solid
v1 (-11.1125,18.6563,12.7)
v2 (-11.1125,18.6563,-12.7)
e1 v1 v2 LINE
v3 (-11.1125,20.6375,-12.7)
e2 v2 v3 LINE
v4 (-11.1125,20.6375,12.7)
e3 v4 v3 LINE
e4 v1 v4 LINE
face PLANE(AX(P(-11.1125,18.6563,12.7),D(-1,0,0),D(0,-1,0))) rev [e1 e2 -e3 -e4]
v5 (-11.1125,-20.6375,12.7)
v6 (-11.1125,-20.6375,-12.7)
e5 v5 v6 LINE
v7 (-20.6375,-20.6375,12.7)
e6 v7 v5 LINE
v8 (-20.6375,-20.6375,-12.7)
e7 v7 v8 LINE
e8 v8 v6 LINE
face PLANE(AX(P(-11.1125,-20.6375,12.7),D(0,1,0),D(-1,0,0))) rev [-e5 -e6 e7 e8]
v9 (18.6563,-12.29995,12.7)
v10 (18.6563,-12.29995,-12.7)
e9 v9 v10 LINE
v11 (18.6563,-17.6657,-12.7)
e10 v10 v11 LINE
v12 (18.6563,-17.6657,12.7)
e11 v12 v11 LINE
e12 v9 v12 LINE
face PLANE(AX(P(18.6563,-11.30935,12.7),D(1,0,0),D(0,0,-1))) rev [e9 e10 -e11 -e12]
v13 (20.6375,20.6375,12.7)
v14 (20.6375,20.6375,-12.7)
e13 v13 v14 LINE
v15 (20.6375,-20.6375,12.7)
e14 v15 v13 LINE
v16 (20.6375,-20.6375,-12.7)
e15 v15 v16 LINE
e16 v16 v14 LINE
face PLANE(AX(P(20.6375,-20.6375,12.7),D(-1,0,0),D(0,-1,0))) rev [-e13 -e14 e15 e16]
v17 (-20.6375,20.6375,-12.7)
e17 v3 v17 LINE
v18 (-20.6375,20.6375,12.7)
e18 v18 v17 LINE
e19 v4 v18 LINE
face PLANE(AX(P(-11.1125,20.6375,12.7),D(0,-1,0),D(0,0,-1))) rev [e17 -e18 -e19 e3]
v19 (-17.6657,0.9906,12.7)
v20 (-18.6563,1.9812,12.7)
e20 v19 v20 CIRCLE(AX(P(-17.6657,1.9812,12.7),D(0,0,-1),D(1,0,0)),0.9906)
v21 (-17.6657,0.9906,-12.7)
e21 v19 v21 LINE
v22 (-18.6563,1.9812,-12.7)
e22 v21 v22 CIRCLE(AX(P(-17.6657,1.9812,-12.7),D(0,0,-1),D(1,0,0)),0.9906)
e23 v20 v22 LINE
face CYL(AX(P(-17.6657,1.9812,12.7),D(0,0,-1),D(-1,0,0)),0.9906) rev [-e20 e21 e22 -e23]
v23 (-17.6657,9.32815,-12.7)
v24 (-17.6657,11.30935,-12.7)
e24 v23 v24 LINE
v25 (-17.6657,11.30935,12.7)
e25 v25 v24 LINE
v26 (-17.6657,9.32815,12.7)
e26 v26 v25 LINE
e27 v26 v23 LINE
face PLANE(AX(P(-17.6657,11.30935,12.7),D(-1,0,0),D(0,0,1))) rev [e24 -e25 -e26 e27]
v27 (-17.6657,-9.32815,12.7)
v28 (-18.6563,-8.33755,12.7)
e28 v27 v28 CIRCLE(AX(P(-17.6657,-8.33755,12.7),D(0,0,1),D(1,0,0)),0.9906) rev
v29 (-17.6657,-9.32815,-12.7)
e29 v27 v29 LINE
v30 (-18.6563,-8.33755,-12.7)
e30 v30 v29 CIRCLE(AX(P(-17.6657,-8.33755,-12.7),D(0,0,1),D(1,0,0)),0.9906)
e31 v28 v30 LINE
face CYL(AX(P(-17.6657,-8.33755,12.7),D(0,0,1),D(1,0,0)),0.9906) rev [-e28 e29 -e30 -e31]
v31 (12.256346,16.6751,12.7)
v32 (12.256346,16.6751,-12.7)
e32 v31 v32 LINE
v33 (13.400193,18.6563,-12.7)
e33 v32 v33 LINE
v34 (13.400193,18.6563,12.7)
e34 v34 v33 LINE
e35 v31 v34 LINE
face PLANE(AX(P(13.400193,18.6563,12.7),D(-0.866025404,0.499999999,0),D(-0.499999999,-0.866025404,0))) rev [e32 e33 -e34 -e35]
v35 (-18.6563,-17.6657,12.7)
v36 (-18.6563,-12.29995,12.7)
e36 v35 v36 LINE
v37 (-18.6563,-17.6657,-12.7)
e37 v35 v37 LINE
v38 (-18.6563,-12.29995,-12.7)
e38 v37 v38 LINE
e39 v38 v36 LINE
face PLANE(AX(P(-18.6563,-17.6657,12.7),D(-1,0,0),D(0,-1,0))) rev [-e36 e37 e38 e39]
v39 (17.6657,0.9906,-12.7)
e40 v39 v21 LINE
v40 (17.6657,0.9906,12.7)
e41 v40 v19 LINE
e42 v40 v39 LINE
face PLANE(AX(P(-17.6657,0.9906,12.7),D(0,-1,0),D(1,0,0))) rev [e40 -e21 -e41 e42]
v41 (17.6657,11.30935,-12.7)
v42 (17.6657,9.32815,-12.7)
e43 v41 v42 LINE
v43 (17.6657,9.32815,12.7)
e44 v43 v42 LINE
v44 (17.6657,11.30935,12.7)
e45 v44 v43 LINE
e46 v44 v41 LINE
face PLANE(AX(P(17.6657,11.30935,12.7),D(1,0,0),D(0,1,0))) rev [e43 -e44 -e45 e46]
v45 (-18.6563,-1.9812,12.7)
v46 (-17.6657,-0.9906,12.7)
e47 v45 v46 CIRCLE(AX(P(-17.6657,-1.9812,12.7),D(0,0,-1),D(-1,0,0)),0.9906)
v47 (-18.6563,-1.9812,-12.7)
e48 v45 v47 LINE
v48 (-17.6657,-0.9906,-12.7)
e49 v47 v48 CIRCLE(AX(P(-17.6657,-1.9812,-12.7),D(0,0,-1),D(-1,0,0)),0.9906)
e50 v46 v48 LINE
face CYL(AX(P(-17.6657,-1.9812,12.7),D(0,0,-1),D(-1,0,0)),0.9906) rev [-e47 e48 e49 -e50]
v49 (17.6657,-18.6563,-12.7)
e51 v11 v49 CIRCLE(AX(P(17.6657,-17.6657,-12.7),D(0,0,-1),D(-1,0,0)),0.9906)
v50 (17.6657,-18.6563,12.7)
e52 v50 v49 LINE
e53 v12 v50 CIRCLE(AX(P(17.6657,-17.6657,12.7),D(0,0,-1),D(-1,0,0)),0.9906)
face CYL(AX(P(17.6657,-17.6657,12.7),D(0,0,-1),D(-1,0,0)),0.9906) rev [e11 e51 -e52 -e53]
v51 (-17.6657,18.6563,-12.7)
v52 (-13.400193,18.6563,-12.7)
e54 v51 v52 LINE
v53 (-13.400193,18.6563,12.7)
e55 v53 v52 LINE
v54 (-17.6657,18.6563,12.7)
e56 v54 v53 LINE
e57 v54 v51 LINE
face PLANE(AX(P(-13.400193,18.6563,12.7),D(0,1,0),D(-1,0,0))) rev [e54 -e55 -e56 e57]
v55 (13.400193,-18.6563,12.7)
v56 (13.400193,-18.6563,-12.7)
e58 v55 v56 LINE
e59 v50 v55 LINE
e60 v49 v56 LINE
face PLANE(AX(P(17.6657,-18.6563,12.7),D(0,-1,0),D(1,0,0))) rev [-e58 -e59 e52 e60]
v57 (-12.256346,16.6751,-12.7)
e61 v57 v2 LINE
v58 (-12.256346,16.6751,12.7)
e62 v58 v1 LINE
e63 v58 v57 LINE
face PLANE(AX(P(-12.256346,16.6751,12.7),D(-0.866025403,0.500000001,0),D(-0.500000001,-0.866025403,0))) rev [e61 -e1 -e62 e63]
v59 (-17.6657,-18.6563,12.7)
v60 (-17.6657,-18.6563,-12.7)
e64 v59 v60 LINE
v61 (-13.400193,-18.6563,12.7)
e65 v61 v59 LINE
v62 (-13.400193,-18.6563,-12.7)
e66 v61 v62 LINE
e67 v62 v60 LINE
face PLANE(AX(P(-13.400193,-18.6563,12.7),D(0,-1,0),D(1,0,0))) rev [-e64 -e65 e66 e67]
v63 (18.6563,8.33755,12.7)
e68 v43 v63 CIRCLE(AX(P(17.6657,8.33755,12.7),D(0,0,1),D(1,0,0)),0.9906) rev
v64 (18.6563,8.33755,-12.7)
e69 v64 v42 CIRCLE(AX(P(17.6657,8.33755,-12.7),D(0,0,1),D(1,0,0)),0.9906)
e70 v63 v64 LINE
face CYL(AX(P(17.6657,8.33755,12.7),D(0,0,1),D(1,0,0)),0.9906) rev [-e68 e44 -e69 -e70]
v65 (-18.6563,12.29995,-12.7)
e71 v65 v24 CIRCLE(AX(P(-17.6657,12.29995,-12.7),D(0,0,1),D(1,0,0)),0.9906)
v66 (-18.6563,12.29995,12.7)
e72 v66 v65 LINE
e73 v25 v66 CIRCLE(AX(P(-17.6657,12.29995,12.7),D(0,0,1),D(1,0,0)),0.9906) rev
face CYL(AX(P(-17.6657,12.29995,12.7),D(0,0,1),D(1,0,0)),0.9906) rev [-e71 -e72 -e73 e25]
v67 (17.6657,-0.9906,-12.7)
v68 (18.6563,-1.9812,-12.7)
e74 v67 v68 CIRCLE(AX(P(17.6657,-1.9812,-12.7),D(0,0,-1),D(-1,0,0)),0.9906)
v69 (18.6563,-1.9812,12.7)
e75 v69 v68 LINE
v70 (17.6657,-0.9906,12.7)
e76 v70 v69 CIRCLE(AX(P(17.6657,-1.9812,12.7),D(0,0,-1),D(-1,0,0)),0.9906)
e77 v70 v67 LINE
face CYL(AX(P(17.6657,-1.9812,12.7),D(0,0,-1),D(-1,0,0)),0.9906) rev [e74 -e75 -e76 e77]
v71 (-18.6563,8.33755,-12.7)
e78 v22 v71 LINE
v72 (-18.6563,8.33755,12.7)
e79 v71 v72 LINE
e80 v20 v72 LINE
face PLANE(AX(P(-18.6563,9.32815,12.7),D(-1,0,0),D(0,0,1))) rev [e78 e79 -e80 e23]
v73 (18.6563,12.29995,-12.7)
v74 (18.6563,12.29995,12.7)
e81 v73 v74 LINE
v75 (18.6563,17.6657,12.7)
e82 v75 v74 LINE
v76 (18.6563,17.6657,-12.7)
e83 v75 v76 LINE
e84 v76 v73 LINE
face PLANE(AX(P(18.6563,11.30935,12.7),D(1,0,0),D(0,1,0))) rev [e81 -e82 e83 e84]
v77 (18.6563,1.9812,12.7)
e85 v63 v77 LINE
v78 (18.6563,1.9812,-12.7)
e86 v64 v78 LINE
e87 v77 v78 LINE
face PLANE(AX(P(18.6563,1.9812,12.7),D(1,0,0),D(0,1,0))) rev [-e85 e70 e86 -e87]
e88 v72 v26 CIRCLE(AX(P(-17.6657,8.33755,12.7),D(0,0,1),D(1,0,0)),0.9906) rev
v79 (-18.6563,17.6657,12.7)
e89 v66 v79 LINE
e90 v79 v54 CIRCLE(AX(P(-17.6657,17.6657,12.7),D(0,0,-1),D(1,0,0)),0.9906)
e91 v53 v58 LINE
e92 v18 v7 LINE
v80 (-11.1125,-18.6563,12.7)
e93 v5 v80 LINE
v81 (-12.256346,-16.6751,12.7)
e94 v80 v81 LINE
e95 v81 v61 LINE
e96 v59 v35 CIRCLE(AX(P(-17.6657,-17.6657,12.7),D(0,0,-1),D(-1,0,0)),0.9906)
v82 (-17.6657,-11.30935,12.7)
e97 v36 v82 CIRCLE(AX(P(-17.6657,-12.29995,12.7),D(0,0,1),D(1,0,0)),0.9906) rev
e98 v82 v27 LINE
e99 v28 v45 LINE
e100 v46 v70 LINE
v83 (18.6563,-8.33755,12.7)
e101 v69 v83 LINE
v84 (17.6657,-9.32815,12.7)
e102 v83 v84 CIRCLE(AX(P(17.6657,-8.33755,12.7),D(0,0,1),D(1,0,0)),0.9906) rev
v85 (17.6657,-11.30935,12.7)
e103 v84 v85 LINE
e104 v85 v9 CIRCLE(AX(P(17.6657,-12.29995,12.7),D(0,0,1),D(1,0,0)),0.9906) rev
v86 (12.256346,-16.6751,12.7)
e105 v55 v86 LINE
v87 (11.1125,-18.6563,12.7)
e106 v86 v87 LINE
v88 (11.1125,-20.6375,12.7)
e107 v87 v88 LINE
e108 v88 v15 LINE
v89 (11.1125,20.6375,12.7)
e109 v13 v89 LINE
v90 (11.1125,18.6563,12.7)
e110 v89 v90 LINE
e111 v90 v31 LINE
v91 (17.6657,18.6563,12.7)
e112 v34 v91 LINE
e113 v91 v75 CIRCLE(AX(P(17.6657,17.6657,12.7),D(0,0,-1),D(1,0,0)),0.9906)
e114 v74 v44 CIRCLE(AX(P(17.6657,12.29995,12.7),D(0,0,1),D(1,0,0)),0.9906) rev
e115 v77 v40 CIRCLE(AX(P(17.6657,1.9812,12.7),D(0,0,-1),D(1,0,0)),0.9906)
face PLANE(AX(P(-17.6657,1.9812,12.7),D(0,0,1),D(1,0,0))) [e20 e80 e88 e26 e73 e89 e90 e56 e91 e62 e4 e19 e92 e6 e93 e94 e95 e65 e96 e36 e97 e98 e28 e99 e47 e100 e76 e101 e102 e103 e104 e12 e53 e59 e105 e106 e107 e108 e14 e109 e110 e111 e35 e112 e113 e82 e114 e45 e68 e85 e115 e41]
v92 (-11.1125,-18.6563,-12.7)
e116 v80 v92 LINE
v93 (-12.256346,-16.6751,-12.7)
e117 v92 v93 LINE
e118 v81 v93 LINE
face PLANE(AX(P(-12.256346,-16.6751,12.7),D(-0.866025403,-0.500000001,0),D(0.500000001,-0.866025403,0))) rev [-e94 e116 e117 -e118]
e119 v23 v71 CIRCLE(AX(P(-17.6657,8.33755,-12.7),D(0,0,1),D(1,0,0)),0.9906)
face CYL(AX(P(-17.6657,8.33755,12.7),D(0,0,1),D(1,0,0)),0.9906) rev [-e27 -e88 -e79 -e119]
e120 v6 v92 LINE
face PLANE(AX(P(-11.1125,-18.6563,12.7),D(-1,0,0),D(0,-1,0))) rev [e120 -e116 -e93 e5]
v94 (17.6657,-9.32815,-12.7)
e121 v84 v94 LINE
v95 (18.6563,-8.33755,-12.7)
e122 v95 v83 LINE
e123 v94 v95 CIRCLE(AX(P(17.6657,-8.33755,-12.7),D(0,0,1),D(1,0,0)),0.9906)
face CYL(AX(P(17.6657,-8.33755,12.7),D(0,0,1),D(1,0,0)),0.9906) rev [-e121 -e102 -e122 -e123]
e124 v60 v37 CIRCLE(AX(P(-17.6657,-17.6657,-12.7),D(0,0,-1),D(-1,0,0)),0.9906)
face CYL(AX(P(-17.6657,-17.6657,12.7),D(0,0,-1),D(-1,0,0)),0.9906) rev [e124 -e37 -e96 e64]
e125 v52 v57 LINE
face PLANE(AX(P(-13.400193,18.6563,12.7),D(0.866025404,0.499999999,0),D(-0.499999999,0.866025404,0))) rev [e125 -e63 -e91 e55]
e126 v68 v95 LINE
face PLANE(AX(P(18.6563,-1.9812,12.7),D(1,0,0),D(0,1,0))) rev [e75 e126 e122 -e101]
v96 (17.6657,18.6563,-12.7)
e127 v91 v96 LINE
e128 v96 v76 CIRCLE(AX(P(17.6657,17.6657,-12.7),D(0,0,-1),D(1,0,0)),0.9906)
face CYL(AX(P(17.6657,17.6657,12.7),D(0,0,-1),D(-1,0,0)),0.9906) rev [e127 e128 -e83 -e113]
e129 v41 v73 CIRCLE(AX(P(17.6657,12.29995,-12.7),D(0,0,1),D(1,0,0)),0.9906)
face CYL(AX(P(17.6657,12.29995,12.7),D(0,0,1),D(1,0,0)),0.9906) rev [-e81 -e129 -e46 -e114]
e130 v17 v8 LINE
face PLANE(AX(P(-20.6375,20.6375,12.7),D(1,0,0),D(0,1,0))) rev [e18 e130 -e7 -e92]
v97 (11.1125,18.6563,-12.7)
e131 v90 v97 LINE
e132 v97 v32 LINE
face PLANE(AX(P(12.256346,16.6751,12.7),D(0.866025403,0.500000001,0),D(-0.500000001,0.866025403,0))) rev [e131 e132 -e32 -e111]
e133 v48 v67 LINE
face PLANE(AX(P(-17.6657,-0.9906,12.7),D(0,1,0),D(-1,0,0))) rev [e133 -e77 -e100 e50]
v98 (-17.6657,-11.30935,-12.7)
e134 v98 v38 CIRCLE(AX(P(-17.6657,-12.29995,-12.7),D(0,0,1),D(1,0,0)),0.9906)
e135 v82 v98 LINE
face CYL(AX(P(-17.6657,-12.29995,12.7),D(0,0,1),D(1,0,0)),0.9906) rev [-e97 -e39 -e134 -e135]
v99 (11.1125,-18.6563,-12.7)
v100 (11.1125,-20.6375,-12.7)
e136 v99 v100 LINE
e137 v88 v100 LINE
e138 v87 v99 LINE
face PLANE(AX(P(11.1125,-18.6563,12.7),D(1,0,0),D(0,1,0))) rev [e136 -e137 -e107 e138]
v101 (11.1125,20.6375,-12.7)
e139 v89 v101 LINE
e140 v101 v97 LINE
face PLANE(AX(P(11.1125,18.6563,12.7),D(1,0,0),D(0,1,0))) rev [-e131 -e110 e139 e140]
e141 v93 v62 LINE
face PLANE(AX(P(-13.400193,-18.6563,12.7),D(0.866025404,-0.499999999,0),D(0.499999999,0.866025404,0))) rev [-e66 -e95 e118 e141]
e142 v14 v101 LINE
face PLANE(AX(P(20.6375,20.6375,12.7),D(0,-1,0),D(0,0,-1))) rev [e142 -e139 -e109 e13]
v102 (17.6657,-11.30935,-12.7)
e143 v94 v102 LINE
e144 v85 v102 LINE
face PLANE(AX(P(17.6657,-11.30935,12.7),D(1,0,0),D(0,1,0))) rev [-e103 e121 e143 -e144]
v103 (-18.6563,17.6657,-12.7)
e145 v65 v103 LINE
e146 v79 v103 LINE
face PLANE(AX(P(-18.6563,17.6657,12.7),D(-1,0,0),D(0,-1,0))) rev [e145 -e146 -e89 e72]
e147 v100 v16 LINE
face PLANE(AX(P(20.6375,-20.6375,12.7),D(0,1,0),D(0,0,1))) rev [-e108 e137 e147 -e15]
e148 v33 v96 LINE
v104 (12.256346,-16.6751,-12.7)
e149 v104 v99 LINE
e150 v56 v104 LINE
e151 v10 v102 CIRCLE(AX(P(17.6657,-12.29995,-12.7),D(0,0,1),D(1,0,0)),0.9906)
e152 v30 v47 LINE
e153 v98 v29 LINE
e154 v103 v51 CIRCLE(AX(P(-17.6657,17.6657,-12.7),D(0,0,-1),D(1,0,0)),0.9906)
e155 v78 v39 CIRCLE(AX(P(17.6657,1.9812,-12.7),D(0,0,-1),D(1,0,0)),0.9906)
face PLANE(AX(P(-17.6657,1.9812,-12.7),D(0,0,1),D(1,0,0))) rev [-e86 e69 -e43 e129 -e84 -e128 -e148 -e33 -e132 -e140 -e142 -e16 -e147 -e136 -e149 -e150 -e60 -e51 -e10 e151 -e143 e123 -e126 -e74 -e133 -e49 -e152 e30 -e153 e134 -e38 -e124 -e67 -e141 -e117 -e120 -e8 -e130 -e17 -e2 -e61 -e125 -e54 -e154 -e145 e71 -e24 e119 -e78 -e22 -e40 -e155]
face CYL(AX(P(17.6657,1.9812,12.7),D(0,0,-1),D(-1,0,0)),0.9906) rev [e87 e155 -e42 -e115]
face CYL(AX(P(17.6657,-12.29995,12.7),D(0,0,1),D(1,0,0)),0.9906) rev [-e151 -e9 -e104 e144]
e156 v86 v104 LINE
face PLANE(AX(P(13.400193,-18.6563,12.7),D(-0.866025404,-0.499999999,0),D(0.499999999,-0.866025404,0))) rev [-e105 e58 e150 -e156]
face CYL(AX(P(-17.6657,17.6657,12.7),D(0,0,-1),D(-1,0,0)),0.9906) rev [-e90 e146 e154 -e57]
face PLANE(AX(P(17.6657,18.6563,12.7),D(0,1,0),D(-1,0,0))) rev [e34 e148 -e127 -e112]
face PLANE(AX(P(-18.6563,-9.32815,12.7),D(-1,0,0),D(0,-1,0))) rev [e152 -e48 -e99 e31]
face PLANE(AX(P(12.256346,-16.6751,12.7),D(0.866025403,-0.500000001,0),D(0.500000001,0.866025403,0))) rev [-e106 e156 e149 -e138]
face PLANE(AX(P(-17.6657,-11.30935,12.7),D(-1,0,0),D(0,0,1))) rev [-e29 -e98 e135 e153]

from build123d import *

# Parameters (mm, degrees)
BASE_EXTRUDE_DEPTH = 12.7
FILLET1_R          = 0.9906


with BuildPart() as part:
    # Sketch1 → Base-Extrude (new, symmetric)
    with BuildSketch(Plane.XY):
        with BuildLine():
            Line((-11.1125, 20.6375), (-20.6375, 20.6375))
            Line((-20.6375, 20.6375), (-20.6375, -20.6375))
            Line((-20.6375, -20.6375), (-11.1125, -20.6375))
            Line((-11.1125, -20.6375), (-11.1125, -18.6563))
            Line((-11.1125, -18.6563), (-12.256346355, -16.6751))
            Line((-12.256346355, -16.6751), (-13.400192707, -18.6563))
            Line((-13.400192707, -18.6563), (-17.6657, -18.6563))
            ThreePointArc((-17.6657, -18.6563), (-18.366159977, -18.366159977), (-18.6563, -17.6657))
            Line((-18.6563, -17.6657), (-18.6563, -11.30935))
            Line((-18.6563, -11.30935), (-17.6657, -11.30935))
            Line((-17.6657, -11.30935), (-17.6657, -9.32815))
            Line((-17.6657, -9.32815), (-18.6563, -9.32815))
            Line((-18.6563, -9.32815), (-18.6563, -1.9812))
            ThreePointArc((-18.6563, -1.9812), (-18.366159977, -1.280740023), (-17.6657, -0.9906))
            Line((-17.6657, -0.9906), (17.6657, -0.9906))
            ThreePointArc((17.6657, -0.9906), (18.366159977, -1.280740023), (18.6563, -1.9812))
            Line((18.6563, -1.9812), (18.6563, -9.32815))
            Line((18.6563, -9.32815), (17.6657, -9.32815))
            Line((17.6657, -9.32815), (17.6657, -11.30935))
            Line((17.6657, -11.30935), (18.6563, -11.30935))
            Line((18.6563, -11.30935), (18.6563, -17.6657))
            ThreePointArc((18.6563, -17.6657), (18.366159977, -18.366159977), (17.6657, -18.6563))
            Line((17.6657, -18.6563), (13.400192707, -18.6563))
            Line((13.400192707, -18.6563), (12.256346355, -16.6751))
            Line((12.256346355, -16.6751), (11.1125, -18.6563))
            Line((11.1125, -18.6563), (11.1125, -20.6375))
            Line((11.1125, -20.6375), (20.6375, -20.6375))
            Line((20.6375, -20.6375), (20.6375, 20.6375))
            Line((20.6375, 20.6375), (11.1125, 20.6375))
            Line((11.1125, 20.6375), (11.1125, 18.6563))
            Line((11.1125, 18.6563), (12.256346355, 16.6751))
            Line((12.256346355, 16.6751), (13.400192707, 18.6563))
            Line((13.400192707, 18.6563), (17.6657, 18.6563))
            ThreePointArc((17.6657, 18.6563), (18.366159977, 18.366159977), (18.6563, 17.6657))
            Line((18.6563, 17.6657), (18.6563, 11.30935))
            Line((18.6563, 11.30935), (17.6657, 11.30935))
            Line((17.6657, 11.30935), (17.6657, 9.32815))
            Line((17.6657, 9.32815), (18.6563, 9.32815))
            Line((18.6563, 9.32815), (18.6563, 1.9812))
            ThreePointArc((18.6563, 1.9812), (18.366159977, 1.280740023), (17.6657, 0.9906))
            Line((17.6657, 0.9906), (-17.6657, 0.9906))
            ThreePointArc((-17.6657, 0.9906), (-18.366159977, 1.280740023), (-18.6563, 1.9812))
            Line((-18.6563, 1.9812), (-18.6563, 9.32815))
            Line((-18.6563, 9.32815), (-17.6657, 9.32815))
            Line((-17.6657, 9.32815), (-17.6657, 11.30935))
            Line((-17.6657, 11.30935), (-18.6563, 11.30935))
            Line((-18.6563, 11.30935), (-18.6563, 17.6657))
            ThreePointArc((-18.6563, 17.6657), (-18.366159977, 18.366159977), (-17.6657, 18.6563))
            Line((-17.6657, 18.6563), (-13.400192707, 18.6563))
            Line((-13.400192707, 18.6563), (-12.256346355, 16.6751))
            Line((-12.256346355, 16.6751), (-11.1125, 18.6563))
            Line((-11.1125, 18.6563), (-11.1125, 20.6375))
        make_face()
    extrude(amount=BASE_EXTRUDE_DEPTH, both=True)

    # Fillet1
    fillet1_edges = [part.edges().sort_by_distance(p)[0] for p in [
        (18.6563, 11.30935, 0),
        (18.6563, -9.32815, 0),
        (-18.6563, 11.30935, 0),
        (-18.6563, -9.32815, 0),
        (-18.6563, 9.32815, 0),
        (-18.6563, -11.30935, 0),
        (18.6563, 9.32815, 0),
        (18.6563, -11.30935, 0),
    ]]
    fillet(fillet1_edges, radius=FILLET1_R - 0.0001)  # a hair under: the kernel refuses the full size


solid = part.part
